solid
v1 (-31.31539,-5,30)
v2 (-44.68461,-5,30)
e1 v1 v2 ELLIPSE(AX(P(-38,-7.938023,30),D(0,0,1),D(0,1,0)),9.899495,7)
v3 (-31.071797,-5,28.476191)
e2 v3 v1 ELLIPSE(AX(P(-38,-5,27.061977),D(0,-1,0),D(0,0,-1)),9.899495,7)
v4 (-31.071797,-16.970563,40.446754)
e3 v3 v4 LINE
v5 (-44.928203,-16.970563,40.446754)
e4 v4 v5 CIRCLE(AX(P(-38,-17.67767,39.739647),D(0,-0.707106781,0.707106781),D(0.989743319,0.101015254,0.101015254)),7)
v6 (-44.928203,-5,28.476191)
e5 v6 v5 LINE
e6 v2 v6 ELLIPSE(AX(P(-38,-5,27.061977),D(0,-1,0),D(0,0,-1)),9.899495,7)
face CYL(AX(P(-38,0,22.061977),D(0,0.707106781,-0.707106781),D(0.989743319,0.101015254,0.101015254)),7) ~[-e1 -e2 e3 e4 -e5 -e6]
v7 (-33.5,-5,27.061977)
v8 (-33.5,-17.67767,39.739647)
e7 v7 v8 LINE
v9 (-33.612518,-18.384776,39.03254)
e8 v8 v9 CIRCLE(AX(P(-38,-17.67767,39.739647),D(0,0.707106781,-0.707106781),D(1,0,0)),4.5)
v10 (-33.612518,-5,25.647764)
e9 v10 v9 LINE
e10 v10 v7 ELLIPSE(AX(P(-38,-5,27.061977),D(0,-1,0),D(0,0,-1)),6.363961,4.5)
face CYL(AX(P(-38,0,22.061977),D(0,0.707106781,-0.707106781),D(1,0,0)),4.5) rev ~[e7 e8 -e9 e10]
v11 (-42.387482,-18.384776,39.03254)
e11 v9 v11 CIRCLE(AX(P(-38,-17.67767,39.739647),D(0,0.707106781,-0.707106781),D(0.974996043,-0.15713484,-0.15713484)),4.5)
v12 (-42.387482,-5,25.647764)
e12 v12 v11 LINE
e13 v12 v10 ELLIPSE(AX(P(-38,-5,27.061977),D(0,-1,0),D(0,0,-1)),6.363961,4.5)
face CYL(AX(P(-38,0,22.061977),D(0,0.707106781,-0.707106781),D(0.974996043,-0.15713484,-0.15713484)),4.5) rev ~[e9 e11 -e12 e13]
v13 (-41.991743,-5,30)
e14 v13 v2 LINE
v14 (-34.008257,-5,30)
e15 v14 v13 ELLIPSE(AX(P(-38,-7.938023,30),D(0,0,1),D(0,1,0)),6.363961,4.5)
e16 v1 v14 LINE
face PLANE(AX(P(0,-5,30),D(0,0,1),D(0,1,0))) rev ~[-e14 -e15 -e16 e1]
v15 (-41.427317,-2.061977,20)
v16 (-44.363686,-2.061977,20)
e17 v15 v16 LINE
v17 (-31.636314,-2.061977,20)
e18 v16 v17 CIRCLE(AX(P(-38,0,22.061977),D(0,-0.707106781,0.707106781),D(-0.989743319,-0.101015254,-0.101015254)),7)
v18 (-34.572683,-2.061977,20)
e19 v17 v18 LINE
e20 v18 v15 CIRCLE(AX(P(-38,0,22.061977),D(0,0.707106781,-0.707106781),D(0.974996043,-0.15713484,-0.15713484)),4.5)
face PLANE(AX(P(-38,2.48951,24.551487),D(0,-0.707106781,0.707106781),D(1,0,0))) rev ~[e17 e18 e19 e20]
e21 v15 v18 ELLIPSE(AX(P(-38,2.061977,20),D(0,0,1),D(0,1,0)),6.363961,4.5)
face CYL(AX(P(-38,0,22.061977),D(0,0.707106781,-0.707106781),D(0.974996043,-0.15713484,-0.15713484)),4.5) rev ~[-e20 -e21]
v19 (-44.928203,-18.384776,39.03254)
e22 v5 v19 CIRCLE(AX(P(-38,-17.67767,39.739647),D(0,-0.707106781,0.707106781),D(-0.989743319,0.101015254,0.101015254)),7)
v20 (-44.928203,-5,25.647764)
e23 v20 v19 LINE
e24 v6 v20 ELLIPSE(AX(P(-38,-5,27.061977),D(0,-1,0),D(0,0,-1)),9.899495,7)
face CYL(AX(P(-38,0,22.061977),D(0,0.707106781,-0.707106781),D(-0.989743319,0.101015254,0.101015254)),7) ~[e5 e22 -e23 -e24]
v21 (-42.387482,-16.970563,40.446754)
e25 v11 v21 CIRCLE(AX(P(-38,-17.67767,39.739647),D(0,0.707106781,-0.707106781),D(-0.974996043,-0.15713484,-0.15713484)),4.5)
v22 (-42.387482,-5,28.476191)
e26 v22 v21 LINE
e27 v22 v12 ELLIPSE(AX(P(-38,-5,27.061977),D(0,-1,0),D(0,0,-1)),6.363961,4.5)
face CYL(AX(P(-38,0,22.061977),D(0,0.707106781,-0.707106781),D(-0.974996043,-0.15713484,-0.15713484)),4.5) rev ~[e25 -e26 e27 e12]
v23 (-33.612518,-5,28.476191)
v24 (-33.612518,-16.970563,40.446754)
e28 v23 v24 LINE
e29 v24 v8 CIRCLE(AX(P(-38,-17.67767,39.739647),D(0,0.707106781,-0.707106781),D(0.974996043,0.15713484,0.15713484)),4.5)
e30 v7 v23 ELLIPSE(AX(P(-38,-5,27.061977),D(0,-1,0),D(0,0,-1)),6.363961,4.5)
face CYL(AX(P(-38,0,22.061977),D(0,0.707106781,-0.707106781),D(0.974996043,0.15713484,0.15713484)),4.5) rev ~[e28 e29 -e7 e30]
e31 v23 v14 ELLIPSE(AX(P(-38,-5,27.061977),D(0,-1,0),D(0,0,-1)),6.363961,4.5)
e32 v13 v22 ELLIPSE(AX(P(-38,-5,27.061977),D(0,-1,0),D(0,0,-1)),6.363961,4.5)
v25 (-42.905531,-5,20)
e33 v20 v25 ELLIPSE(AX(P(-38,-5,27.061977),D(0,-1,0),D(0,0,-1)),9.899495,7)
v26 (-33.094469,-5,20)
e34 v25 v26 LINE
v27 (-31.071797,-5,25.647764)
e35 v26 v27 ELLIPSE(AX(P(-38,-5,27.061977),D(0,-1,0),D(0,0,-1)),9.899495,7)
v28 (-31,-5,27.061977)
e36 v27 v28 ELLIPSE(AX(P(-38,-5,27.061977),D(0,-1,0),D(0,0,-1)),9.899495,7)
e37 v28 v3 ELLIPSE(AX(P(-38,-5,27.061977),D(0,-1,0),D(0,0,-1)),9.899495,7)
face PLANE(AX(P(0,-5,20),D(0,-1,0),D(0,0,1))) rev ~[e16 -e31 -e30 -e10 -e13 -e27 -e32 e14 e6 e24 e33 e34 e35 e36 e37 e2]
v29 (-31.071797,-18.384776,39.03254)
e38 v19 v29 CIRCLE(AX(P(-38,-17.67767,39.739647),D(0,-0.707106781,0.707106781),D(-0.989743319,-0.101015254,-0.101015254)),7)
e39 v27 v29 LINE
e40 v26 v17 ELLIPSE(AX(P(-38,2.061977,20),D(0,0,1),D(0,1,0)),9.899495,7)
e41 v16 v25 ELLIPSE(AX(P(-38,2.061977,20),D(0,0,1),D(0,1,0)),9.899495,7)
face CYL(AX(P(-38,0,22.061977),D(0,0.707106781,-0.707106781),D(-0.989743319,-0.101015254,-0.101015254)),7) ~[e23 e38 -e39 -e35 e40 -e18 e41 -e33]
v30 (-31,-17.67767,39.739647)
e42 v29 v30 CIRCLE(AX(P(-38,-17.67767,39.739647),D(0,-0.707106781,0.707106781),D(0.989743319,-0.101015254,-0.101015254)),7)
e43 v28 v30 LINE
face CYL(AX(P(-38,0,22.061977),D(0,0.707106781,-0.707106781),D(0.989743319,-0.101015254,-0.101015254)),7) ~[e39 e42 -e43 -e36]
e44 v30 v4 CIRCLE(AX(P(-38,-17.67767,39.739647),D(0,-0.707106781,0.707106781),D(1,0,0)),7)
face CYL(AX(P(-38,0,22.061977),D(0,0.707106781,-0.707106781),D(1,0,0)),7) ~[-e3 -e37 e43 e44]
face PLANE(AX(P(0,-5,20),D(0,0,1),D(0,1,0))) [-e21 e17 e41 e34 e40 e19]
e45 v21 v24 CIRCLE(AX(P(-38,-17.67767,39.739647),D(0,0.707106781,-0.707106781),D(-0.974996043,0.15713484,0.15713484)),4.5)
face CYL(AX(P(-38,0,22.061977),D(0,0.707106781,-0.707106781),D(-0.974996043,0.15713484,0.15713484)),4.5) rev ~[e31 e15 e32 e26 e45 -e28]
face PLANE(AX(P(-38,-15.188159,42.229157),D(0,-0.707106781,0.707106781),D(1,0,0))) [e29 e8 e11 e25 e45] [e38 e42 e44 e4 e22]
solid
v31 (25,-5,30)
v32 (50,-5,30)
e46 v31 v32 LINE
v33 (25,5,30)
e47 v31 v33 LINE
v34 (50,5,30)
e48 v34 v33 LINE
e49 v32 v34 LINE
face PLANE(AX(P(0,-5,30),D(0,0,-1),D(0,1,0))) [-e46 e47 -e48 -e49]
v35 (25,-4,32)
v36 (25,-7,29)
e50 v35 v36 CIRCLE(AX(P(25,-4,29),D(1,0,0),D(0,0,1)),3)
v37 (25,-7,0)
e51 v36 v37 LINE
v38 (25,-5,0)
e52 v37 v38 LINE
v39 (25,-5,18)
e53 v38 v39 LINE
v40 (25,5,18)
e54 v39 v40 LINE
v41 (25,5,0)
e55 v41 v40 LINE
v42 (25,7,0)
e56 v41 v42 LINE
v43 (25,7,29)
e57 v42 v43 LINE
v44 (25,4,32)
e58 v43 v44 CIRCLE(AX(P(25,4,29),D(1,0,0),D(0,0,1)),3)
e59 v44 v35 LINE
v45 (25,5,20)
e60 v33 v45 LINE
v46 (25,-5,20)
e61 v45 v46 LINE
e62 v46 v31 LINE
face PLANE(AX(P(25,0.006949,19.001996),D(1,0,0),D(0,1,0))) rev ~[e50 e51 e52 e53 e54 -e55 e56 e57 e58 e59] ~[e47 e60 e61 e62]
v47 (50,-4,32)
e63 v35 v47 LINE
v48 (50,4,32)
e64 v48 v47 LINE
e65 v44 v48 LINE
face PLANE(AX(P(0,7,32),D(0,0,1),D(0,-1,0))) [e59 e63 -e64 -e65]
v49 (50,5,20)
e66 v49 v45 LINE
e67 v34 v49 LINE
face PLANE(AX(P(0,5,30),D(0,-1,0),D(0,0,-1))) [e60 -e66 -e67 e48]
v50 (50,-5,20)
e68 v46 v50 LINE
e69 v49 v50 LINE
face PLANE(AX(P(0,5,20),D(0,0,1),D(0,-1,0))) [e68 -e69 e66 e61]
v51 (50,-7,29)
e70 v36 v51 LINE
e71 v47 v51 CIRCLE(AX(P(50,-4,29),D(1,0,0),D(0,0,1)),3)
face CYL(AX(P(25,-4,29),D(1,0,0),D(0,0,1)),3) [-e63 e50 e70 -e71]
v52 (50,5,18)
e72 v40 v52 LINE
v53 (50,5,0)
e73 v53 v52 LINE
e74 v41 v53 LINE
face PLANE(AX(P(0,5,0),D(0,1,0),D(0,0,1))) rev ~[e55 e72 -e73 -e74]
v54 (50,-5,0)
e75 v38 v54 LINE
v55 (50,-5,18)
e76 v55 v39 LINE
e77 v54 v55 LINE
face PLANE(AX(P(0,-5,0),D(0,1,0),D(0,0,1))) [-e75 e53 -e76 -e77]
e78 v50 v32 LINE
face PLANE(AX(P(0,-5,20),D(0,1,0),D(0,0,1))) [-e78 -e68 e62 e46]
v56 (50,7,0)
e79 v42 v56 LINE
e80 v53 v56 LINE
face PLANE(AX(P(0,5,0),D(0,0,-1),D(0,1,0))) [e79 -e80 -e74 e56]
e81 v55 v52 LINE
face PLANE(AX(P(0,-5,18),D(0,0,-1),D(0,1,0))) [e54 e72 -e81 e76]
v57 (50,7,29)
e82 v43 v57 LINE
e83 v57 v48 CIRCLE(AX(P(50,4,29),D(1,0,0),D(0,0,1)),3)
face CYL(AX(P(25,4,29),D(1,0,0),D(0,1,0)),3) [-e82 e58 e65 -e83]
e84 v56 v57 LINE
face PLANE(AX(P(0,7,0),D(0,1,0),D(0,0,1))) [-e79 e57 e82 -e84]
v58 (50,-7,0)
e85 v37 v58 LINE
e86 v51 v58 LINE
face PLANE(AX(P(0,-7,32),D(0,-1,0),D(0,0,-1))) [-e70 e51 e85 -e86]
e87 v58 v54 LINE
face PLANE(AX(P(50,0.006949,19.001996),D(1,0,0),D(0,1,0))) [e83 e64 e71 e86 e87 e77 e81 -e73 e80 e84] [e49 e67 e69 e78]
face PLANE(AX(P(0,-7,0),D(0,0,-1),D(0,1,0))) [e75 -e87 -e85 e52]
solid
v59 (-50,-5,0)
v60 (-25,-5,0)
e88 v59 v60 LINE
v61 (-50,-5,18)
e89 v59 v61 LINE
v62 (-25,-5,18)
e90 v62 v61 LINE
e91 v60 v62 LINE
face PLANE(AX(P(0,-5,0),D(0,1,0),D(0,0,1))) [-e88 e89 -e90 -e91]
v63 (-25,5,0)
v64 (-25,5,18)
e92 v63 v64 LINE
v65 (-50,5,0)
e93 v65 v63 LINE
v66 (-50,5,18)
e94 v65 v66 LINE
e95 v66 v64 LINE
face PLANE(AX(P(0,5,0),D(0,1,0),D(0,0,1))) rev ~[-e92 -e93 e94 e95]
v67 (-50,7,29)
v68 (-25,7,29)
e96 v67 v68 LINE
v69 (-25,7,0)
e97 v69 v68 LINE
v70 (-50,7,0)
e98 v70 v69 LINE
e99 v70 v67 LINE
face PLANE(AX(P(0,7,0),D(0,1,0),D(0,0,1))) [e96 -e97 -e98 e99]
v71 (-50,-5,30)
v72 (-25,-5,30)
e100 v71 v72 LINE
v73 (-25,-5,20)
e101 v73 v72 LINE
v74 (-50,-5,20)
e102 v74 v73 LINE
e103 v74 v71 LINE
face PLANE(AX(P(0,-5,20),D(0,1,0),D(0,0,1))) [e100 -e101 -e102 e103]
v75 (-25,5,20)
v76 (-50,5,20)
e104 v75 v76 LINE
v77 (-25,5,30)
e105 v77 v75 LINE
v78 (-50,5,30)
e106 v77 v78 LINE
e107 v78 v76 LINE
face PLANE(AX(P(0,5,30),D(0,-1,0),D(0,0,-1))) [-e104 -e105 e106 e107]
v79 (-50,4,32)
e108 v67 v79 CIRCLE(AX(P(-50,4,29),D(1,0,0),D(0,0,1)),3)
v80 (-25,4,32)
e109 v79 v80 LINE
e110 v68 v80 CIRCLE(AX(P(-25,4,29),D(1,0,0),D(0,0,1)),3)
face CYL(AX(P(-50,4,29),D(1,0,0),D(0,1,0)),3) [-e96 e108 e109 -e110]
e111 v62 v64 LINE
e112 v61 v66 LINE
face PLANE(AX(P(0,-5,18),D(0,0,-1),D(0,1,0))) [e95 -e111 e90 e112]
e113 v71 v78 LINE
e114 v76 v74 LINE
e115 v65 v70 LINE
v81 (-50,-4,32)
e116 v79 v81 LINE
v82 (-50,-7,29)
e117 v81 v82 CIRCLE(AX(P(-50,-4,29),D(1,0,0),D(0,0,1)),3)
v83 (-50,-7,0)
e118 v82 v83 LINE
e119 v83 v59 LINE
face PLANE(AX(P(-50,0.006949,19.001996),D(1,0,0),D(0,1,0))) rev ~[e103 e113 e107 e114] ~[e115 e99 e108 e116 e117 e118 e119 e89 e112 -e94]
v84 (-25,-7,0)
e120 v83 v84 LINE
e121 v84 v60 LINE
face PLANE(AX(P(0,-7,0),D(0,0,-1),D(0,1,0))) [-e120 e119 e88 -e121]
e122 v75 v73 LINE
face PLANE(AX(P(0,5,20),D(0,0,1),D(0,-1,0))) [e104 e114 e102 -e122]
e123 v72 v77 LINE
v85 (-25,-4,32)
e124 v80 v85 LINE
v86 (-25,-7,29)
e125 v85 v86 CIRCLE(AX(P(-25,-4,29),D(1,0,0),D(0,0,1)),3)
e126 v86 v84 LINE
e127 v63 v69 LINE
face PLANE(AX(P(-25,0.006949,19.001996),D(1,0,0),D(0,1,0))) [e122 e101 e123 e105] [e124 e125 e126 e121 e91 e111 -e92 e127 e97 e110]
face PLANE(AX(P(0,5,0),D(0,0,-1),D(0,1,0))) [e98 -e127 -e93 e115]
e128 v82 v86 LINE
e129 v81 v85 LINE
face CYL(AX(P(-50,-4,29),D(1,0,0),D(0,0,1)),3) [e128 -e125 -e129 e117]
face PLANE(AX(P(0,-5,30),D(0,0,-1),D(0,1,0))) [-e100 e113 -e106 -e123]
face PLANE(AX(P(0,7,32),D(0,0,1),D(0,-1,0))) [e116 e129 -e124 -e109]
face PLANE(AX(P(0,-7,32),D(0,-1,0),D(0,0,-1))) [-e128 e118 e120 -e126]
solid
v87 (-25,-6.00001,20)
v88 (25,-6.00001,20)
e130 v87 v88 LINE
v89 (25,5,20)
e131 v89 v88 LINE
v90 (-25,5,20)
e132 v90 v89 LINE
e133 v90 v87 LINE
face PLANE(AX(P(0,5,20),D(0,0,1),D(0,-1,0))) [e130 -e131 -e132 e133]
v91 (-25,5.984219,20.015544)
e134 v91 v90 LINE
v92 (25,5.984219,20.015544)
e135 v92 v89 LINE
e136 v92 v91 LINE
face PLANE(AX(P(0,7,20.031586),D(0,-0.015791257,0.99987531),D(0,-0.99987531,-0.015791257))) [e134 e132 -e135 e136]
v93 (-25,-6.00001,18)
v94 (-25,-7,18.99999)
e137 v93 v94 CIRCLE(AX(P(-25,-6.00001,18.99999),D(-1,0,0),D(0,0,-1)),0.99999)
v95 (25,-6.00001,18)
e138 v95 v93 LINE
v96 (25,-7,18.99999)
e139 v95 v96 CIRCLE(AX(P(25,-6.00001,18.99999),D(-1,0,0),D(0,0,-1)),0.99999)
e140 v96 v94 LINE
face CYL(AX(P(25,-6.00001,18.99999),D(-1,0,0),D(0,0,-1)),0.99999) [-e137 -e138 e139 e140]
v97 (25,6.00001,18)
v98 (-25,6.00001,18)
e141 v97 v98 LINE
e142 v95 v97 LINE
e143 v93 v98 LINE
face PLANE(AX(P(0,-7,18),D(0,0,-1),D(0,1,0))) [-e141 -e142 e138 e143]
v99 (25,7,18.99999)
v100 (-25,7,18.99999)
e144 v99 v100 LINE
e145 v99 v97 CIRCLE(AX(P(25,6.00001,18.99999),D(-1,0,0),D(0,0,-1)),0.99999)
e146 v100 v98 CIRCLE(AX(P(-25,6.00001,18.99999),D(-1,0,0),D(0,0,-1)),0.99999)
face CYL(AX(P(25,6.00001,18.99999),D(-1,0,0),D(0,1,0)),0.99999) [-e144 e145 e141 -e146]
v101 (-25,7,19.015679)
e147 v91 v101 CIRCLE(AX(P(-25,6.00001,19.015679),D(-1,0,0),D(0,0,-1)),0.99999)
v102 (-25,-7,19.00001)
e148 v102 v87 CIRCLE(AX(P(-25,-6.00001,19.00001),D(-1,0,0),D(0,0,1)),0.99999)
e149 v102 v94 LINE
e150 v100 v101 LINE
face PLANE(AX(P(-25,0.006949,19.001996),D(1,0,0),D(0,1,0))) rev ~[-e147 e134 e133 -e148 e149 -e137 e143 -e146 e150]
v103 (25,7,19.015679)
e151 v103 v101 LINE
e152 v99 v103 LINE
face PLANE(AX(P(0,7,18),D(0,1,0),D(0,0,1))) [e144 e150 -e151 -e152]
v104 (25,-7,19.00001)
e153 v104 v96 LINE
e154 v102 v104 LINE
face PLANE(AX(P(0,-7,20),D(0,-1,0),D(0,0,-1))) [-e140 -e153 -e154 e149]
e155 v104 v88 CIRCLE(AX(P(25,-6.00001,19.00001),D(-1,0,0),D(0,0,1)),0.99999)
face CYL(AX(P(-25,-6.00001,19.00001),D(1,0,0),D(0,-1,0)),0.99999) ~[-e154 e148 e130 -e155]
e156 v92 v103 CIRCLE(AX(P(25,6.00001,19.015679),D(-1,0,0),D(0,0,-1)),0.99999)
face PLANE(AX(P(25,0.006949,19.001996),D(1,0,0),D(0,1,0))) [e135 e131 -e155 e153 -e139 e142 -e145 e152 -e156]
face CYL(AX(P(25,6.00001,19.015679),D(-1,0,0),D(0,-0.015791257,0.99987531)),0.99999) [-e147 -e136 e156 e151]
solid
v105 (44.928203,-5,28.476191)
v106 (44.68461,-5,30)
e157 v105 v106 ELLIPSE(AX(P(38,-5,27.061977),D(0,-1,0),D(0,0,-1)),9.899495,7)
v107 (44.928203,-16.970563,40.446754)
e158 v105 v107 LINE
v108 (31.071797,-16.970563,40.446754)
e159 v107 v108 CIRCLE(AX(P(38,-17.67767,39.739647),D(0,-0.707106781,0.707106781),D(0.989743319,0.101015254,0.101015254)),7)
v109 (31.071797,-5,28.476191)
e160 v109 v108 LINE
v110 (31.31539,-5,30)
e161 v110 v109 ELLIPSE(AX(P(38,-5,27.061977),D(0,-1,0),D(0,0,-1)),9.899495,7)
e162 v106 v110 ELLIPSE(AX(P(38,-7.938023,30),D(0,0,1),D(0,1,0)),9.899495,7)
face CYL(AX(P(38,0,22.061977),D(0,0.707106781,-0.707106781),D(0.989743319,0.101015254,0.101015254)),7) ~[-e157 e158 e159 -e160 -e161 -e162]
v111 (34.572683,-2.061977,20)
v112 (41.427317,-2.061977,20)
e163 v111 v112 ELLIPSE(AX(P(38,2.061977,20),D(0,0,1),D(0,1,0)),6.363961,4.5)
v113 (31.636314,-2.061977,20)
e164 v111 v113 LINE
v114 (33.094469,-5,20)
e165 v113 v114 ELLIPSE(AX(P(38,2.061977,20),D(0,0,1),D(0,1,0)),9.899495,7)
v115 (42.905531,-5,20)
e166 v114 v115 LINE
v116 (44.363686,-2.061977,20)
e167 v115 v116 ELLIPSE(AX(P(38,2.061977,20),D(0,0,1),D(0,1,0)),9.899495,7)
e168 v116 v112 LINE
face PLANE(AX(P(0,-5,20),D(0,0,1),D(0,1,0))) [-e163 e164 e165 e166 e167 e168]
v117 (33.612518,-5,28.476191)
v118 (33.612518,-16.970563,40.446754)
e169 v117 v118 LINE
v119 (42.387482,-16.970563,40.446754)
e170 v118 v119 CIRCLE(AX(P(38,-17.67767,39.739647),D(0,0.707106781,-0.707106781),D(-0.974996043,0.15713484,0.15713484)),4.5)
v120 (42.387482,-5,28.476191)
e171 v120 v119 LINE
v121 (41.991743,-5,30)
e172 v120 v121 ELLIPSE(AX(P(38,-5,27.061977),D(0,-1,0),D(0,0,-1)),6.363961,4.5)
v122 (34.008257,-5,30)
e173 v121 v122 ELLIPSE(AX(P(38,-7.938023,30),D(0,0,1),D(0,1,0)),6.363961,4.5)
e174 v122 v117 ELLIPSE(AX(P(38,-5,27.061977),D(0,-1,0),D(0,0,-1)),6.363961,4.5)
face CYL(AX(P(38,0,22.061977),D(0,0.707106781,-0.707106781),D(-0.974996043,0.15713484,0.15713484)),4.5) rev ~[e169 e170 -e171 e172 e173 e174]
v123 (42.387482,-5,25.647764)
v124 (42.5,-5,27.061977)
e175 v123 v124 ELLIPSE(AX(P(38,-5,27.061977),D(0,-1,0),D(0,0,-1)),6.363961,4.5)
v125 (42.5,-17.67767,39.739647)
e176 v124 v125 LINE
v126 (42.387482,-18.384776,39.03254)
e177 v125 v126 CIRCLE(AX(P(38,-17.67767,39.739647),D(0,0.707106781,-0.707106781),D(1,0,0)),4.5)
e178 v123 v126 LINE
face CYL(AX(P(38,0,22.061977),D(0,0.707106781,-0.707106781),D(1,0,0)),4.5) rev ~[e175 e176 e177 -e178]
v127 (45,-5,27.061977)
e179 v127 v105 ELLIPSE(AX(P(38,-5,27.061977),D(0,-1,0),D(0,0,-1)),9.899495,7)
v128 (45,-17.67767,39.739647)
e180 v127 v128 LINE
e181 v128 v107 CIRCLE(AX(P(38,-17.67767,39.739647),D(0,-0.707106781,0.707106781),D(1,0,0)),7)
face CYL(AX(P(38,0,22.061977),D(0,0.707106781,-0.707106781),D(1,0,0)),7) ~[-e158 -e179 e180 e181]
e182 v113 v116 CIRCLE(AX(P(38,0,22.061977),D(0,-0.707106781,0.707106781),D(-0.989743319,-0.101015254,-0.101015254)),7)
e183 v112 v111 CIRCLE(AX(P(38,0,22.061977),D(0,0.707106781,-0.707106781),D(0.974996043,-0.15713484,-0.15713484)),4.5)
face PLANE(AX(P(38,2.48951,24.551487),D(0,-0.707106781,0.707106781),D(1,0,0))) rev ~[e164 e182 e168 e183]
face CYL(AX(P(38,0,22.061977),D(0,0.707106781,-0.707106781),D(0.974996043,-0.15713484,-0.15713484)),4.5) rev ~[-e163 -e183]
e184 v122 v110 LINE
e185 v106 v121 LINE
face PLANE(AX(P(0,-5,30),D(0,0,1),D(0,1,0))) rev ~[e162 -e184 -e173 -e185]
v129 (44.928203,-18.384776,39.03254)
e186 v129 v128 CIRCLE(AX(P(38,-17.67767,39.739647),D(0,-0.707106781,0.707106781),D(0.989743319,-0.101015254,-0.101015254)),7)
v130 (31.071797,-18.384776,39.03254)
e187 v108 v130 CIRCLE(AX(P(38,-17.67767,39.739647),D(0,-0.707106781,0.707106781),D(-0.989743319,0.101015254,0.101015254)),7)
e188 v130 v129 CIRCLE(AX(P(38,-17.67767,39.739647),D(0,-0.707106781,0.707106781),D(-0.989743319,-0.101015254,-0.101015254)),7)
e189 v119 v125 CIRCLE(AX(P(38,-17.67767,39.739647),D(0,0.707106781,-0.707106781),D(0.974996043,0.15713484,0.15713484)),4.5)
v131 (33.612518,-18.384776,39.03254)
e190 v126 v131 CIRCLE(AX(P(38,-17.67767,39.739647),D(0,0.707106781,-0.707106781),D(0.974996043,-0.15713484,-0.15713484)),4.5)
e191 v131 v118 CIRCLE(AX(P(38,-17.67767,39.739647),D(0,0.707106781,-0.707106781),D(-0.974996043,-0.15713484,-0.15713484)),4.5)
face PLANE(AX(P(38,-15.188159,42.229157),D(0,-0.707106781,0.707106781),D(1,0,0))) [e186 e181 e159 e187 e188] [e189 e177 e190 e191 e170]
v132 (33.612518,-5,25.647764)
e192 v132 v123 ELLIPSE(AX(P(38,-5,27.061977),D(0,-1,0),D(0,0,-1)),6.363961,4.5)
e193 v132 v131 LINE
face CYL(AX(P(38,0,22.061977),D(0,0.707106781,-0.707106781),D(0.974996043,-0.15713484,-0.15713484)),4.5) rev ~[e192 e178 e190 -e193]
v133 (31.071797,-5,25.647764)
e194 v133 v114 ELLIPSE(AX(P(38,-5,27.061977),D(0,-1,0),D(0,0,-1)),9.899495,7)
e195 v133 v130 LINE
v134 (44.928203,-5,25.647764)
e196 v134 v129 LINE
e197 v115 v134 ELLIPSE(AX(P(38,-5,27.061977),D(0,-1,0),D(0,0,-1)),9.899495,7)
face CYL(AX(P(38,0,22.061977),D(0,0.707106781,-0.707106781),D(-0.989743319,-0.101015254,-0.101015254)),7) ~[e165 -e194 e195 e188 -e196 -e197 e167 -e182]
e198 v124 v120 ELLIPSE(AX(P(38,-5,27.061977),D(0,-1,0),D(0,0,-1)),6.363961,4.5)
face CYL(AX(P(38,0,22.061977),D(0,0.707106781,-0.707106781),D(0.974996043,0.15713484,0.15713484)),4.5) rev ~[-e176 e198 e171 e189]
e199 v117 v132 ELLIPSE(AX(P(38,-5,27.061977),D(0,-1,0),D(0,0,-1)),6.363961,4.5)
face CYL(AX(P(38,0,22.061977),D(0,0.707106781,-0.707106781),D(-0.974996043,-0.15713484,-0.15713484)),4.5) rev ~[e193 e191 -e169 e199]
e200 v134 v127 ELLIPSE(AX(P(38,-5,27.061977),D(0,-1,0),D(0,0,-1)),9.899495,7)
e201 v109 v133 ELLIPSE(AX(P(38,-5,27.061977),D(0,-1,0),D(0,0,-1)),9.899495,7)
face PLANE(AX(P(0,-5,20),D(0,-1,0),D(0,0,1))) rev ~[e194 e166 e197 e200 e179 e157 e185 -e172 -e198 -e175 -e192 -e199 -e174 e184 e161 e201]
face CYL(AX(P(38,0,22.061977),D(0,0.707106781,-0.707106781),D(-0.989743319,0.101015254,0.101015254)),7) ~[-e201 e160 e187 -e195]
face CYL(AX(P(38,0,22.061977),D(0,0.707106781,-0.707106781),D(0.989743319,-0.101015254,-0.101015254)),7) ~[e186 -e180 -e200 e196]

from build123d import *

# Parameters (mm, degrees)
F1_DEPTH      = 25
F2_ANGLE      = 45
F3_W          = 2
F3_H          = 18
F4_DEPTH      = 50
F4_DEPTH_BACK = 50
F5_DEPTH      = 25
F5_DEPTH_BACK = 25
F6_DEPTH      = 25
F6_DEPTH_BACK = 25
F3_W_2        = 10
F3_H_2        = 10
F7_DEPTH      = 50
F7_DEPTH_BACK = 50
F8_R          = 3
F9_R          = 0.99999


# Not quite as in the source:
# - a fillet or chamfer is up to 0.001 mm smaller than in the source, because OpenCascade refuses the exact size


with BuildPart() as f1:
    # F0 (on Front) → F1 (new body)
    with BuildSketch(Plane.XZ):
        with BuildLine():
            Line((-33.6125178063, 23.0619773716), (-31.0717967697, 23.0619773716))
            ThreePointArc((-31.0717967697, 23.0619773716), (-38, 29.0619773716), (-44.9282032303, 23.0619773716))
            Line((-44.9282032303, 23.0619773716), (-42.3874821937, 23.0619773716))
            ThreePointArc((-42.3874821937, 23.0619773716), (-38, 26.5619773716), (-33.6125178063, 23.0619773716))
        make_face()
        with BuildLine():
            Line((-42.3874821937, 23.0619773716), (-44.9282032303, 23.0619773716))
            ThreePointArc((-44.9282032303, 23.0619773716), (-45, 22.0619773716), (-44.9282032303, 21.0619773716))
            Line((-44.9282032303, 21.0619773716), (-42.3874821937, 21.0619773716))
            ThreePointArc((-42.3874821937, 21.0619773716), (-42.5, 22.0619773716), (-42.3874821937, 23.0619773716))
        make_face()
        with BuildLine():
            ThreePointArc((-44.9282032303, 21.0619773716), (-38, 15.0619773716), (-31.0717967697, 21.0619773716))
            Line((-31.0717967697, 21.0619773716), (-33.6125178063, 21.0619773716))
            ThreePointArc((-33.6125178063, 21.0619773716), (-38, 17.5619773716), (-42.3874821937, 21.0619773716))
            Line((-42.3874821937, 21.0619773716), (-44.9282032303, 21.0619773716))
        make_face()
        with BuildLine():
            ThreePointArc((-31.0717967697, 21.0619773716), (-31.017972264, 21.560690334), (-31, 22.0619773716))
            ThreePointArc((-31, 22.0619773716), (-31.017972264, 22.5632644091), (-31.0717967697, 23.0619773716))
            Line((-31.0717967697, 23.0619773716), (-33.6125178063, 23.0619773716))
            ThreePointArc((-33.6125178063, 23.0619773716), (-33.5282179239, 22.565132481), (-33.5, 22.0619773716))
            ThreePointArc((-33.5, 22.0619773716), (-33.5282179239, 21.5588222621), (-33.6125178063, 21.0619773716))
            Line((-33.6125178063, 21.0619773716), (-31.0717967697, 21.0619773716))
        make_face()
    extrude(amount=F1_DEPTH)


with BuildPart() as f1b:
    # F0 (on Front) → F1, piece 2 (new body)
    with BuildSketch(Plane.XZ):
        with BuildLine():
            ThreePointArc((44.9282032303, 23.0619773716), (38, 29.0619773716), (31.0717967697, 23.0619773716))
            Line((31.0717967697, 23.0619773716), (33.6125178063, 23.0619773716))
            ThreePointArc((33.6125178063, 23.0619773716), (38, 26.5619773716), (42.3874821937, 23.0619773716))
            Line((42.3874821937, 23.0619773716), (44.9282032303, 23.0619773716))
        make_face()
        with BuildLine():
            Line((33.6125178063, 23.0619773716), (31.0717967697, 23.0619773716))
            ThreePointArc((31.0717967697, 23.0619773716), (31, 22.0619773716), (31.0717967697, 21.0619773716))
            Line((31.0717967697, 21.0619773716), (33.6125178063, 21.0619773716))
            ThreePointArc((33.6125178063, 21.0619773716), (33.5, 22.0619773716), (33.6125178063, 23.0619773716))
        make_face()
        with BuildLine():
            Line((33.6125178063, 21.0619773716), (31.0717967697, 21.0619773716))
            ThreePointArc((31.0717967697, 21.0619773716), (38, 15.0619773716), (44.9282032303, 21.0619773716))
            Line((44.9282032303, 21.0619773716), (42.3874821937, 21.0619773716))
            ThreePointArc((42.3874821937, 21.0619773716), (38, 17.5619773716), (33.6125178063, 21.0619773716))
        make_face()
        with BuildLine():
            ThreePointArc((45, 22.0619773716), (44.982027736, 22.5632644091), (44.9282032303, 23.0619773716))
            Line((44.9282032303, 23.0619773716), (42.3874821937, 23.0619773716))
            ThreePointArc((42.3874821937, 23.0619773716), (42.4717820761, 22.565132481), (42.5, 22.0619773716))
            ThreePointArc((42.5, 22.0619773716), (42.4717820761, 21.5588222621), (42.3874821937, 21.0619773716))
            Line((42.3874821937, 21.0619773716), (44.9282032303, 21.0619773716))
            ThreePointArc((44.9282032303, 21.0619773716), (44.982027736, 21.560690334), (45, 22.0619773716))
        make_face()
    extrude(amount=F1_DEPTH)


with BuildPart() as f1_1:
    # F2: moved
    add(f1.part.rotate(Axis((25, 0, 22.0619773716), (-1, 0, 0)), F2_ANGLE))


with BuildPart() as f1b_1:
    # F2: moved
    add(f1b.part.rotate(Axis((25, 0, 22.0619773716), (-1, 0, 0)), F2_ANGLE))


with BuildPart() as f4:
    # F3 (on Right) → F4 (new body, two sides)
    with BuildSketch(Plane.YZ) as f4_sk:
        Polygon((7, 20.0315864533), (5, 20), (-5, 20), (-7, 20), (-7, 18), (-5, 18), (5, 18), (7, 18), align=None)
        Polygon((5, 30), (5, 20), (7, 20.0315864533), (7, 32), (-7, 32), (-7, 20), (-5, 20), (-5, 30), align=None)
        with Locations((6, 9)):
            Rectangle(F3_W, F3_H)
        with Locations((-6, 9)):
            Rectangle(F3_W, F3_H)
    extrude(amount=F4_DEPTH)
    extrude(f4_sk.sketch, amount=-F4_DEPTH_BACK)

    # F3 (on Right) → F5 (cut, two sides)
    with BuildSketch(Plane.YZ) as f5_sk:
        Polygon((7, 20.0315864533), (5, 20), (-5, 20), (-7, 20), (-7, 18), (-5, 18), (5, 18), (7, 18), align=None)
        Polygon((5, 30), (5, 20), (7, 20.0315864533), (7, 32), (-7, 32), (-7, 20), (-5, 20), (-5, 30), align=None)
        with Locations((6, 9)):
            Rectangle(F3_W, F3_H)
        with Locations((-6, 9)):
            Rectangle(F3_W, F3_H)
    extrude(amount=-F5_DEPTH, mode=Mode.SUBTRACT)
    extrude(f5_sk.sketch, amount=F5_DEPTH_BACK, mode=Mode.SUBTRACT)

    # F8
    f8_edges = [f4.edges().sort_by_distance(p)[0] for p in [
        (37.5, 7, 32),
        (-37.5, 7, 32),
        (37.5, -7, 32),
        (-37.5, -7, 32),
    ]]
    fillet(f8_edges, radius=F8_R)


with BuildPart() as f6:
    # F3 (on Right) → F6 (new body, two sides)
    with BuildSketch(Plane.YZ) as f6_sk:
        Polygon((7, 20.0315864533), (5, 20), (-5, 20), (-7, 20), (-7, 18), (-5, 18), (5, 18), (7, 18), align=None)
    extrude(amount=F6_DEPTH)
    extrude(f6_sk.sketch, amount=-F6_DEPTH_BACK)

    # F9 (radius 1 in the source; OpenCascade refuses exactly that, so slightly less here)
    f9_edges = [f6.edges().sort_by_distance(p)[0] for p in [
        (0, -7, 20),
        (0, -7, 18),
        (0, 7, 20.031586),
        (0, 7, 18),
    ]]
    fillet(f9_edges, radius=F9_R)


with BuildPart() as f7_tool:
    # F3 (on Right) → F7 (new body, two sides)
    with BuildSketch(Plane.YZ) as f7_sk:
        with Locations((0, 25)):
            Rectangle(F3_W_2, F3_H_2)
    extrude(amount=-F7_DEPTH)
    extrude(f7_sk.sketch, amount=F7_DEPTH_BACK)


with BuildPart() as f1_2:
    add(f1_1.part)

    # F7: cut by f7_tool
    add(f7_tool.part, mode=Mode.SUBTRACT)


with BuildPart() as f1b_2:
    add(f1b_1.part)

    # F7: cut by f7_tool
    add(f7_tool.part, mode=Mode.SUBTRACT)


solid = Compound([f4.part, f6.part, f1_2.part, f1b_2.part])
